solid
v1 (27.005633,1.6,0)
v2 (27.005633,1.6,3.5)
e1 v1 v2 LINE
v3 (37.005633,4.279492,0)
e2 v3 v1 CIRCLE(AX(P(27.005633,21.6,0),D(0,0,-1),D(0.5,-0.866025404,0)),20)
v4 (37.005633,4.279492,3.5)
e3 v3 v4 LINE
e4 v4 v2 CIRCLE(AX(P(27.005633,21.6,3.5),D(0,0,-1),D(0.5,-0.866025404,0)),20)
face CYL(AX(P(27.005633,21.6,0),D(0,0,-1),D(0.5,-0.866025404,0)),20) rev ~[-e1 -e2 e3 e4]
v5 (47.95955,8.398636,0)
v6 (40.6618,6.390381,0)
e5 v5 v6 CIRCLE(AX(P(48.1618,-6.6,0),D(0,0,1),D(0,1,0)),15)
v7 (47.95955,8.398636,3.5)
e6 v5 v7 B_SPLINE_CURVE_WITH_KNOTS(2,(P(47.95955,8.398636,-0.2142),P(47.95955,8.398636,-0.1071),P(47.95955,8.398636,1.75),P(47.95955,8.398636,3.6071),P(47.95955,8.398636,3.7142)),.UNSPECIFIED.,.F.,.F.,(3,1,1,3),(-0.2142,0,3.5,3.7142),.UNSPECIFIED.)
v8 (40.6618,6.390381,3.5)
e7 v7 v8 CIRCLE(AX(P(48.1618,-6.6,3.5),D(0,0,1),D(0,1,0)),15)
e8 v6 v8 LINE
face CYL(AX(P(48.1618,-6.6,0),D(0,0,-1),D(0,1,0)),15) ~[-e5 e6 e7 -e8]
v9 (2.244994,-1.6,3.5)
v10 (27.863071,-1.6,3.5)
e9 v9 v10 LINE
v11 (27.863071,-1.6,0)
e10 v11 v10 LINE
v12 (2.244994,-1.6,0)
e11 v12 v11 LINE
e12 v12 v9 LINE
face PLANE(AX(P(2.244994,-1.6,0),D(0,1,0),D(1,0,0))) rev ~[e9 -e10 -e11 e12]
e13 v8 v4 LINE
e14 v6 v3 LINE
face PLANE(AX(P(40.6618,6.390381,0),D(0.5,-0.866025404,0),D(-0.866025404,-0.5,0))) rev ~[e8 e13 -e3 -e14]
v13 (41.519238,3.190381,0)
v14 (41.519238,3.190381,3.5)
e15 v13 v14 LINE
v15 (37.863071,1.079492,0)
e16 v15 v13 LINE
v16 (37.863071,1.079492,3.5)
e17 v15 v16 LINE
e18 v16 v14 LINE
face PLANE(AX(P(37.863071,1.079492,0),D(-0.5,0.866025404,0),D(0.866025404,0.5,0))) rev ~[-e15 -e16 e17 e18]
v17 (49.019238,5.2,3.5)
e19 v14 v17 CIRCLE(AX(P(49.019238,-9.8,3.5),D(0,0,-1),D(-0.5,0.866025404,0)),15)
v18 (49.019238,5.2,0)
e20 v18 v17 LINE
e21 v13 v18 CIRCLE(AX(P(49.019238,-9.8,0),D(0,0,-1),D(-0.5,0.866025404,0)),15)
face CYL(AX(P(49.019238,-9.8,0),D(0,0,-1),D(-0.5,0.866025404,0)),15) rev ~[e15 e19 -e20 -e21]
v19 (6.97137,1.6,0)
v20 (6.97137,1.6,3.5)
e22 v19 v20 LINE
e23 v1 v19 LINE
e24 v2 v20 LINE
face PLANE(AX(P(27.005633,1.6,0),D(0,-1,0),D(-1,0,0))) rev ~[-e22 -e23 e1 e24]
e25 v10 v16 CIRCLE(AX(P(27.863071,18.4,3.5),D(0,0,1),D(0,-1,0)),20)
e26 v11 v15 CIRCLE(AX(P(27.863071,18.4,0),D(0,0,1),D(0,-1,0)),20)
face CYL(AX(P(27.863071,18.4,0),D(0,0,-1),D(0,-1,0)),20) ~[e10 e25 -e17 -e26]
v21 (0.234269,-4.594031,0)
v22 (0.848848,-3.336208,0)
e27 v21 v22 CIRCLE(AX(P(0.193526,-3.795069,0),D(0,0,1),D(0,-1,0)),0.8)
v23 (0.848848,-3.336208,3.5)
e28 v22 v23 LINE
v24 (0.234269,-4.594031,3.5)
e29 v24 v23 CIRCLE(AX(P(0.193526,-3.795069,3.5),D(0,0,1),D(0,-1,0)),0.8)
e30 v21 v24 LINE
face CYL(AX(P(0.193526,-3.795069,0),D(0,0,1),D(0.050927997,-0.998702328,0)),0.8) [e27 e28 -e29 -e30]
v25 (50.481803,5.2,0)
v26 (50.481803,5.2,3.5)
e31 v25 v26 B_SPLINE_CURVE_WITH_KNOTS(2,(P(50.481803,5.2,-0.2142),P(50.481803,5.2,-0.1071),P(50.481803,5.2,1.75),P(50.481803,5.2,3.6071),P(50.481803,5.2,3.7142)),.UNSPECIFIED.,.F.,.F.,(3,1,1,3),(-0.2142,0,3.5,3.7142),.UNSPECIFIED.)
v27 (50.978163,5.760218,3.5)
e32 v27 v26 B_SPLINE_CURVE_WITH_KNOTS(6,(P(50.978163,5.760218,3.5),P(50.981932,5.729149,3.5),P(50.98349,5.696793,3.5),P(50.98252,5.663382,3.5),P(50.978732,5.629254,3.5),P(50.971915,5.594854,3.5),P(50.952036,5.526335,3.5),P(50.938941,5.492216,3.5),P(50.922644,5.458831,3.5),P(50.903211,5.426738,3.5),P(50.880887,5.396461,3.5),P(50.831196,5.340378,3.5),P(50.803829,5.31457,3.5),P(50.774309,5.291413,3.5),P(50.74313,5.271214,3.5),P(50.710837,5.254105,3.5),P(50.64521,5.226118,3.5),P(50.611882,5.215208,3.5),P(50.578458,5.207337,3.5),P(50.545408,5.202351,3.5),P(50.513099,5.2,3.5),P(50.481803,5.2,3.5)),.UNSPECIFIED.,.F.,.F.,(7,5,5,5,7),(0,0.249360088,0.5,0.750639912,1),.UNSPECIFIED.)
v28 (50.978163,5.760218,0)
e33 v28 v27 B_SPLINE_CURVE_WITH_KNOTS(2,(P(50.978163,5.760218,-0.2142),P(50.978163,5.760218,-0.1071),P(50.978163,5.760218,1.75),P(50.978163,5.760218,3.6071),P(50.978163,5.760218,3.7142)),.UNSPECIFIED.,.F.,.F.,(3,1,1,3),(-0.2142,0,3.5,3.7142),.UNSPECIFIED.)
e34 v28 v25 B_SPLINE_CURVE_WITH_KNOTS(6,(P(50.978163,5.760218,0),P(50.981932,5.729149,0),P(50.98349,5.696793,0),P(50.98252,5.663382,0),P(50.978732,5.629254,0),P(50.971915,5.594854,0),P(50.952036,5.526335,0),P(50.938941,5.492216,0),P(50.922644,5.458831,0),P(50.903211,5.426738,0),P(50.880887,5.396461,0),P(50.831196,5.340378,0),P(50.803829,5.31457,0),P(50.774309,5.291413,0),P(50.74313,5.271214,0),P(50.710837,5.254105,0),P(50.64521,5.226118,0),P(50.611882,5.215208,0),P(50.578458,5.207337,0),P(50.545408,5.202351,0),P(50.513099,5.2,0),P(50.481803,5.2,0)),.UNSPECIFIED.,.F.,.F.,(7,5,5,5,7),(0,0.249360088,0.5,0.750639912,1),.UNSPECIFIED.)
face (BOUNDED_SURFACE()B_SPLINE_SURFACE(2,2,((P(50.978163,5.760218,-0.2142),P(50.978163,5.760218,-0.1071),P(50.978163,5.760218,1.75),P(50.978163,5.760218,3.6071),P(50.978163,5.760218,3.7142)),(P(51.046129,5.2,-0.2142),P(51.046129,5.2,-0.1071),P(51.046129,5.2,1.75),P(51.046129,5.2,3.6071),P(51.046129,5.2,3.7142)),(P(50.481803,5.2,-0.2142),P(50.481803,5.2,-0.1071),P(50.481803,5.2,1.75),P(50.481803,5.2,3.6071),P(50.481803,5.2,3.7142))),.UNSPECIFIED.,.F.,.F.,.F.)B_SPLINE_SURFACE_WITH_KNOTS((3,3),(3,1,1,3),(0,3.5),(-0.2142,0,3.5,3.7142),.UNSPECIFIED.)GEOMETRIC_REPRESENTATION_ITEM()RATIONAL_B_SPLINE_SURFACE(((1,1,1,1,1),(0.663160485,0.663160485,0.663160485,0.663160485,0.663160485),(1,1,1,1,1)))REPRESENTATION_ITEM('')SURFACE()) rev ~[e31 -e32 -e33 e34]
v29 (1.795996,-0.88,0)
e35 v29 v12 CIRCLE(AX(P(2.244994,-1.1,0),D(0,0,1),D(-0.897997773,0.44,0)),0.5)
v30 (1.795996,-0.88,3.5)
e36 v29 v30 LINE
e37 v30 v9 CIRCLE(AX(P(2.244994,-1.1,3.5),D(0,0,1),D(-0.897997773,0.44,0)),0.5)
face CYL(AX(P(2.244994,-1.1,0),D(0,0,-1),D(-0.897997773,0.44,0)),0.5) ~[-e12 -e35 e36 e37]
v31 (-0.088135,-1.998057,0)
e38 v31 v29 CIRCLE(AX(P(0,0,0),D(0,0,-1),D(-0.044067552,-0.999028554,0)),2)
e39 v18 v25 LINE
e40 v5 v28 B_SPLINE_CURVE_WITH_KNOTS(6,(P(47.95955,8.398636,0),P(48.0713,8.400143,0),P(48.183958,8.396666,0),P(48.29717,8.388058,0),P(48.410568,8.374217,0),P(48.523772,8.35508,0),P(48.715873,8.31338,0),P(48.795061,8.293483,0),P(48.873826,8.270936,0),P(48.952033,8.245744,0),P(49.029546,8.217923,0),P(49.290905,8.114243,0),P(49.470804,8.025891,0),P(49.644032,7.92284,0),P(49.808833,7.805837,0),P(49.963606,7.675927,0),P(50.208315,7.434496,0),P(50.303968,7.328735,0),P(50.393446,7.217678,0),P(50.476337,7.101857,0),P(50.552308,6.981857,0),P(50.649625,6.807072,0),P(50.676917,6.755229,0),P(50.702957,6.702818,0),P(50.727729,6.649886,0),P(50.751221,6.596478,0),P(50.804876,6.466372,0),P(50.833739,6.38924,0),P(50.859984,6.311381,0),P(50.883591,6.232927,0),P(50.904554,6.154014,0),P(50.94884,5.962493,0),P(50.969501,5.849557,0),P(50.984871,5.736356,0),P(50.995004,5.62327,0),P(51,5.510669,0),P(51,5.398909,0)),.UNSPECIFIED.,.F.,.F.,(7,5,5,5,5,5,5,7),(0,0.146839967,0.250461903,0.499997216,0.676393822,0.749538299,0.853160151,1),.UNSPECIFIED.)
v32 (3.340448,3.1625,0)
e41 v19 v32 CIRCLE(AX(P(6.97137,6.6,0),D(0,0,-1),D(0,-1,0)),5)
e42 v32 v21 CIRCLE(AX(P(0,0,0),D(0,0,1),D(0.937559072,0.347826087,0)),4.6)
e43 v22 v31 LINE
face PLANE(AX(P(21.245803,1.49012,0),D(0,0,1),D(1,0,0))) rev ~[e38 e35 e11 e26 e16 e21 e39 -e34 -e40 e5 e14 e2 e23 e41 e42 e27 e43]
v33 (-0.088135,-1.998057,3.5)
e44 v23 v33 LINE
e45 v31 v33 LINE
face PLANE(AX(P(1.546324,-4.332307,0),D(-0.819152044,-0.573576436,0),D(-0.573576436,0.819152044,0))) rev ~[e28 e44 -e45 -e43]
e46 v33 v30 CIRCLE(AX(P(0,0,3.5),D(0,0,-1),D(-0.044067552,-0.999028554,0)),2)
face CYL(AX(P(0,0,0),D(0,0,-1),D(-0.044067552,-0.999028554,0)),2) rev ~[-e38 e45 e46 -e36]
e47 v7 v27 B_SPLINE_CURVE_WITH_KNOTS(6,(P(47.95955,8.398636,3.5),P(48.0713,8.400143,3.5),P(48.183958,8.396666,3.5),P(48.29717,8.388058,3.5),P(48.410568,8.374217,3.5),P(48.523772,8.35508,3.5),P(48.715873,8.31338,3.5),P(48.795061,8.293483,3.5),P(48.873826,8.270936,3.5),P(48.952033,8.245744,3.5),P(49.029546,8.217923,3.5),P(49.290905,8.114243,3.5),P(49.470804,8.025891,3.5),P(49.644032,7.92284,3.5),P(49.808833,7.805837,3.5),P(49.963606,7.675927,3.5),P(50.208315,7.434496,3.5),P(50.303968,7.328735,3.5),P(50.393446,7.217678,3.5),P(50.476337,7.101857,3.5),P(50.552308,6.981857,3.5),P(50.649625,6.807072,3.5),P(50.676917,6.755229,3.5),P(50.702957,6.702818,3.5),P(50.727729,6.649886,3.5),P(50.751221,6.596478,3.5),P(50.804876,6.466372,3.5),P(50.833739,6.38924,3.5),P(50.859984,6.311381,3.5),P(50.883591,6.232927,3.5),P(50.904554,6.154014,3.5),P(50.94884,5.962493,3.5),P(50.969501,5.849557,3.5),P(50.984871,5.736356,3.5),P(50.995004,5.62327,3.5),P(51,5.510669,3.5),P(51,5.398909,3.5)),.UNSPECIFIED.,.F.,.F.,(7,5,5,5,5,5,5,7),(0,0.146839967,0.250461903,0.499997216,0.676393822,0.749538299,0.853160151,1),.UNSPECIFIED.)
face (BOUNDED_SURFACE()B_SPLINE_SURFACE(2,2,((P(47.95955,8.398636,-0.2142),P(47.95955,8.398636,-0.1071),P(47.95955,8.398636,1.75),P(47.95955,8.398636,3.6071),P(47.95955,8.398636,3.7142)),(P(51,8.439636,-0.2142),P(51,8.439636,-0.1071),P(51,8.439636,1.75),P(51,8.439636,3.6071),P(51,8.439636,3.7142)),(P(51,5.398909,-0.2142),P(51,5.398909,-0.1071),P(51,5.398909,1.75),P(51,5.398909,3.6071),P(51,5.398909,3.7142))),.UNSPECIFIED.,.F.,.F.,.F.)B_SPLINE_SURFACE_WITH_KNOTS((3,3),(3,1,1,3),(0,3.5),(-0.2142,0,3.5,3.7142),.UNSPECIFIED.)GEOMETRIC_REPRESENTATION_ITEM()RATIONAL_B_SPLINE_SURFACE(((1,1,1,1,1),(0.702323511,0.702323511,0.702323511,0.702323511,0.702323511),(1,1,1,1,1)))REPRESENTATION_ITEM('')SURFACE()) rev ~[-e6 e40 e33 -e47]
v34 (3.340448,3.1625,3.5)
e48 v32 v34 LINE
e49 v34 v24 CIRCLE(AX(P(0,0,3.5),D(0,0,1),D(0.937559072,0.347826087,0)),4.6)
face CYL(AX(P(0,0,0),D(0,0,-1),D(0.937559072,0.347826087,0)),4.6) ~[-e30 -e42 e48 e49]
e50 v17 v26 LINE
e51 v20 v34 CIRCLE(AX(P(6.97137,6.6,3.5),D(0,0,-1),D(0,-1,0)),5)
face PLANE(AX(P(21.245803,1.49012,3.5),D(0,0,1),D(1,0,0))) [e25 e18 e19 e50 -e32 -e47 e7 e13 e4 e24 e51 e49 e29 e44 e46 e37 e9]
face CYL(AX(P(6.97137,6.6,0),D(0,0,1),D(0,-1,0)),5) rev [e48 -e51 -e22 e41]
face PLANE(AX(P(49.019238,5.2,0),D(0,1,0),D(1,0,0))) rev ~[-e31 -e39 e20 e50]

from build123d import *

# Parameters (mm, degrees)
F1_DEPTH = 3.5
F2_R     = 5
F3_R     = 0.8
F4_R     = 3
F5_R     = 0.5


with BuildPart() as f1:
    # F0 (on Top) → F1 (new body)
    with BuildSketch(Plane.XY):
        with BuildLine():
            Line((27.0056332441, 1.6), (4.3127717306, 1.6))
            ThreePointArc((4.3127717306, 1.6), (-4.1689707148, 1.9441407303), (1.5463240937, -4.3323067525))
            Line((1.5463240937, -4.3323067525), (-0.0881351041, -1.9980571072))
            ThreePointArc((-0.0881351041, -1.9980571072), (-1.0206418303, 1.7199680969), (1.7959955457, -0.88))
            ThreePointArc((1.7959955457, -0.88), (1.8207303634, -1.3645751311), (2.2449944321, -1.6))
            Line((2.2449944321, -1.6), (4.3127717306, -1.6))
            Line((4.3127717306, -1.6), (27.8630706599, -1.6))
            ThreePointArc((27.8630706599, -1.6), (33.039451562, -0.9185165258), (37.8630706599, 1.0794919243))
            Line((37.8630706599, 1.0794919243), (41.5192378865, 3.1903810568))
            ThreePointArc((41.5192378865, 3.1903810568), (45.1369522099, 4.6888873943), (49.0192378865, 5.2))
            Line((49.0192378865, 5.2), (51, 5.2))
            Line((51, 5.2), (51, 8.4))
            Line((51, 8.4), (48.1618004707, 8.4))
            ThreePointArc((48.1618004707, 8.4), (44.2795147941, 7.8888873943), (40.6618004707, 6.3903810568))
            Line((40.6618004707, 6.3903810568), (37.0056332441, 4.2794919243))
            ThreePointArc((37.0056332441, 4.2794919243), (32.1820141462, 2.2814834742), (27.0056332441, 1.6))
        make_face()
    extrude(amount=F1_DEPTH)

    # F2
    f2_edges = [f1.edges().sort_by_distance(p)[0] for p in [
        (4.312772, 1.6, 1.75),
        (27.863071, -1.6, 1.75),
    ]]
    fillet(f2_edges, radius=F2_R)

    # F3
    f3_edges = [f1.edges().sort_by_distance(p)[0] for p in [
        (1.546324, -4.332307, 1.75),
    ]]
    fillet(f3_edges, radius=F3_R)

    # F4
    f4_edges = [f1.edges().sort_by_distance(p)[0] for p in [
        (51, 8.4, 1.75),
    ]]
    fillet(f4_edges, radius=F4_R)

    # F5
    f5_edges = [f1.edges().sort_by_distance(p)[0] for p in [
        (51, 5.2, 1.75),
    ]]
    fillet(f5_edges, radius=F5_R)


solid = f1.part
